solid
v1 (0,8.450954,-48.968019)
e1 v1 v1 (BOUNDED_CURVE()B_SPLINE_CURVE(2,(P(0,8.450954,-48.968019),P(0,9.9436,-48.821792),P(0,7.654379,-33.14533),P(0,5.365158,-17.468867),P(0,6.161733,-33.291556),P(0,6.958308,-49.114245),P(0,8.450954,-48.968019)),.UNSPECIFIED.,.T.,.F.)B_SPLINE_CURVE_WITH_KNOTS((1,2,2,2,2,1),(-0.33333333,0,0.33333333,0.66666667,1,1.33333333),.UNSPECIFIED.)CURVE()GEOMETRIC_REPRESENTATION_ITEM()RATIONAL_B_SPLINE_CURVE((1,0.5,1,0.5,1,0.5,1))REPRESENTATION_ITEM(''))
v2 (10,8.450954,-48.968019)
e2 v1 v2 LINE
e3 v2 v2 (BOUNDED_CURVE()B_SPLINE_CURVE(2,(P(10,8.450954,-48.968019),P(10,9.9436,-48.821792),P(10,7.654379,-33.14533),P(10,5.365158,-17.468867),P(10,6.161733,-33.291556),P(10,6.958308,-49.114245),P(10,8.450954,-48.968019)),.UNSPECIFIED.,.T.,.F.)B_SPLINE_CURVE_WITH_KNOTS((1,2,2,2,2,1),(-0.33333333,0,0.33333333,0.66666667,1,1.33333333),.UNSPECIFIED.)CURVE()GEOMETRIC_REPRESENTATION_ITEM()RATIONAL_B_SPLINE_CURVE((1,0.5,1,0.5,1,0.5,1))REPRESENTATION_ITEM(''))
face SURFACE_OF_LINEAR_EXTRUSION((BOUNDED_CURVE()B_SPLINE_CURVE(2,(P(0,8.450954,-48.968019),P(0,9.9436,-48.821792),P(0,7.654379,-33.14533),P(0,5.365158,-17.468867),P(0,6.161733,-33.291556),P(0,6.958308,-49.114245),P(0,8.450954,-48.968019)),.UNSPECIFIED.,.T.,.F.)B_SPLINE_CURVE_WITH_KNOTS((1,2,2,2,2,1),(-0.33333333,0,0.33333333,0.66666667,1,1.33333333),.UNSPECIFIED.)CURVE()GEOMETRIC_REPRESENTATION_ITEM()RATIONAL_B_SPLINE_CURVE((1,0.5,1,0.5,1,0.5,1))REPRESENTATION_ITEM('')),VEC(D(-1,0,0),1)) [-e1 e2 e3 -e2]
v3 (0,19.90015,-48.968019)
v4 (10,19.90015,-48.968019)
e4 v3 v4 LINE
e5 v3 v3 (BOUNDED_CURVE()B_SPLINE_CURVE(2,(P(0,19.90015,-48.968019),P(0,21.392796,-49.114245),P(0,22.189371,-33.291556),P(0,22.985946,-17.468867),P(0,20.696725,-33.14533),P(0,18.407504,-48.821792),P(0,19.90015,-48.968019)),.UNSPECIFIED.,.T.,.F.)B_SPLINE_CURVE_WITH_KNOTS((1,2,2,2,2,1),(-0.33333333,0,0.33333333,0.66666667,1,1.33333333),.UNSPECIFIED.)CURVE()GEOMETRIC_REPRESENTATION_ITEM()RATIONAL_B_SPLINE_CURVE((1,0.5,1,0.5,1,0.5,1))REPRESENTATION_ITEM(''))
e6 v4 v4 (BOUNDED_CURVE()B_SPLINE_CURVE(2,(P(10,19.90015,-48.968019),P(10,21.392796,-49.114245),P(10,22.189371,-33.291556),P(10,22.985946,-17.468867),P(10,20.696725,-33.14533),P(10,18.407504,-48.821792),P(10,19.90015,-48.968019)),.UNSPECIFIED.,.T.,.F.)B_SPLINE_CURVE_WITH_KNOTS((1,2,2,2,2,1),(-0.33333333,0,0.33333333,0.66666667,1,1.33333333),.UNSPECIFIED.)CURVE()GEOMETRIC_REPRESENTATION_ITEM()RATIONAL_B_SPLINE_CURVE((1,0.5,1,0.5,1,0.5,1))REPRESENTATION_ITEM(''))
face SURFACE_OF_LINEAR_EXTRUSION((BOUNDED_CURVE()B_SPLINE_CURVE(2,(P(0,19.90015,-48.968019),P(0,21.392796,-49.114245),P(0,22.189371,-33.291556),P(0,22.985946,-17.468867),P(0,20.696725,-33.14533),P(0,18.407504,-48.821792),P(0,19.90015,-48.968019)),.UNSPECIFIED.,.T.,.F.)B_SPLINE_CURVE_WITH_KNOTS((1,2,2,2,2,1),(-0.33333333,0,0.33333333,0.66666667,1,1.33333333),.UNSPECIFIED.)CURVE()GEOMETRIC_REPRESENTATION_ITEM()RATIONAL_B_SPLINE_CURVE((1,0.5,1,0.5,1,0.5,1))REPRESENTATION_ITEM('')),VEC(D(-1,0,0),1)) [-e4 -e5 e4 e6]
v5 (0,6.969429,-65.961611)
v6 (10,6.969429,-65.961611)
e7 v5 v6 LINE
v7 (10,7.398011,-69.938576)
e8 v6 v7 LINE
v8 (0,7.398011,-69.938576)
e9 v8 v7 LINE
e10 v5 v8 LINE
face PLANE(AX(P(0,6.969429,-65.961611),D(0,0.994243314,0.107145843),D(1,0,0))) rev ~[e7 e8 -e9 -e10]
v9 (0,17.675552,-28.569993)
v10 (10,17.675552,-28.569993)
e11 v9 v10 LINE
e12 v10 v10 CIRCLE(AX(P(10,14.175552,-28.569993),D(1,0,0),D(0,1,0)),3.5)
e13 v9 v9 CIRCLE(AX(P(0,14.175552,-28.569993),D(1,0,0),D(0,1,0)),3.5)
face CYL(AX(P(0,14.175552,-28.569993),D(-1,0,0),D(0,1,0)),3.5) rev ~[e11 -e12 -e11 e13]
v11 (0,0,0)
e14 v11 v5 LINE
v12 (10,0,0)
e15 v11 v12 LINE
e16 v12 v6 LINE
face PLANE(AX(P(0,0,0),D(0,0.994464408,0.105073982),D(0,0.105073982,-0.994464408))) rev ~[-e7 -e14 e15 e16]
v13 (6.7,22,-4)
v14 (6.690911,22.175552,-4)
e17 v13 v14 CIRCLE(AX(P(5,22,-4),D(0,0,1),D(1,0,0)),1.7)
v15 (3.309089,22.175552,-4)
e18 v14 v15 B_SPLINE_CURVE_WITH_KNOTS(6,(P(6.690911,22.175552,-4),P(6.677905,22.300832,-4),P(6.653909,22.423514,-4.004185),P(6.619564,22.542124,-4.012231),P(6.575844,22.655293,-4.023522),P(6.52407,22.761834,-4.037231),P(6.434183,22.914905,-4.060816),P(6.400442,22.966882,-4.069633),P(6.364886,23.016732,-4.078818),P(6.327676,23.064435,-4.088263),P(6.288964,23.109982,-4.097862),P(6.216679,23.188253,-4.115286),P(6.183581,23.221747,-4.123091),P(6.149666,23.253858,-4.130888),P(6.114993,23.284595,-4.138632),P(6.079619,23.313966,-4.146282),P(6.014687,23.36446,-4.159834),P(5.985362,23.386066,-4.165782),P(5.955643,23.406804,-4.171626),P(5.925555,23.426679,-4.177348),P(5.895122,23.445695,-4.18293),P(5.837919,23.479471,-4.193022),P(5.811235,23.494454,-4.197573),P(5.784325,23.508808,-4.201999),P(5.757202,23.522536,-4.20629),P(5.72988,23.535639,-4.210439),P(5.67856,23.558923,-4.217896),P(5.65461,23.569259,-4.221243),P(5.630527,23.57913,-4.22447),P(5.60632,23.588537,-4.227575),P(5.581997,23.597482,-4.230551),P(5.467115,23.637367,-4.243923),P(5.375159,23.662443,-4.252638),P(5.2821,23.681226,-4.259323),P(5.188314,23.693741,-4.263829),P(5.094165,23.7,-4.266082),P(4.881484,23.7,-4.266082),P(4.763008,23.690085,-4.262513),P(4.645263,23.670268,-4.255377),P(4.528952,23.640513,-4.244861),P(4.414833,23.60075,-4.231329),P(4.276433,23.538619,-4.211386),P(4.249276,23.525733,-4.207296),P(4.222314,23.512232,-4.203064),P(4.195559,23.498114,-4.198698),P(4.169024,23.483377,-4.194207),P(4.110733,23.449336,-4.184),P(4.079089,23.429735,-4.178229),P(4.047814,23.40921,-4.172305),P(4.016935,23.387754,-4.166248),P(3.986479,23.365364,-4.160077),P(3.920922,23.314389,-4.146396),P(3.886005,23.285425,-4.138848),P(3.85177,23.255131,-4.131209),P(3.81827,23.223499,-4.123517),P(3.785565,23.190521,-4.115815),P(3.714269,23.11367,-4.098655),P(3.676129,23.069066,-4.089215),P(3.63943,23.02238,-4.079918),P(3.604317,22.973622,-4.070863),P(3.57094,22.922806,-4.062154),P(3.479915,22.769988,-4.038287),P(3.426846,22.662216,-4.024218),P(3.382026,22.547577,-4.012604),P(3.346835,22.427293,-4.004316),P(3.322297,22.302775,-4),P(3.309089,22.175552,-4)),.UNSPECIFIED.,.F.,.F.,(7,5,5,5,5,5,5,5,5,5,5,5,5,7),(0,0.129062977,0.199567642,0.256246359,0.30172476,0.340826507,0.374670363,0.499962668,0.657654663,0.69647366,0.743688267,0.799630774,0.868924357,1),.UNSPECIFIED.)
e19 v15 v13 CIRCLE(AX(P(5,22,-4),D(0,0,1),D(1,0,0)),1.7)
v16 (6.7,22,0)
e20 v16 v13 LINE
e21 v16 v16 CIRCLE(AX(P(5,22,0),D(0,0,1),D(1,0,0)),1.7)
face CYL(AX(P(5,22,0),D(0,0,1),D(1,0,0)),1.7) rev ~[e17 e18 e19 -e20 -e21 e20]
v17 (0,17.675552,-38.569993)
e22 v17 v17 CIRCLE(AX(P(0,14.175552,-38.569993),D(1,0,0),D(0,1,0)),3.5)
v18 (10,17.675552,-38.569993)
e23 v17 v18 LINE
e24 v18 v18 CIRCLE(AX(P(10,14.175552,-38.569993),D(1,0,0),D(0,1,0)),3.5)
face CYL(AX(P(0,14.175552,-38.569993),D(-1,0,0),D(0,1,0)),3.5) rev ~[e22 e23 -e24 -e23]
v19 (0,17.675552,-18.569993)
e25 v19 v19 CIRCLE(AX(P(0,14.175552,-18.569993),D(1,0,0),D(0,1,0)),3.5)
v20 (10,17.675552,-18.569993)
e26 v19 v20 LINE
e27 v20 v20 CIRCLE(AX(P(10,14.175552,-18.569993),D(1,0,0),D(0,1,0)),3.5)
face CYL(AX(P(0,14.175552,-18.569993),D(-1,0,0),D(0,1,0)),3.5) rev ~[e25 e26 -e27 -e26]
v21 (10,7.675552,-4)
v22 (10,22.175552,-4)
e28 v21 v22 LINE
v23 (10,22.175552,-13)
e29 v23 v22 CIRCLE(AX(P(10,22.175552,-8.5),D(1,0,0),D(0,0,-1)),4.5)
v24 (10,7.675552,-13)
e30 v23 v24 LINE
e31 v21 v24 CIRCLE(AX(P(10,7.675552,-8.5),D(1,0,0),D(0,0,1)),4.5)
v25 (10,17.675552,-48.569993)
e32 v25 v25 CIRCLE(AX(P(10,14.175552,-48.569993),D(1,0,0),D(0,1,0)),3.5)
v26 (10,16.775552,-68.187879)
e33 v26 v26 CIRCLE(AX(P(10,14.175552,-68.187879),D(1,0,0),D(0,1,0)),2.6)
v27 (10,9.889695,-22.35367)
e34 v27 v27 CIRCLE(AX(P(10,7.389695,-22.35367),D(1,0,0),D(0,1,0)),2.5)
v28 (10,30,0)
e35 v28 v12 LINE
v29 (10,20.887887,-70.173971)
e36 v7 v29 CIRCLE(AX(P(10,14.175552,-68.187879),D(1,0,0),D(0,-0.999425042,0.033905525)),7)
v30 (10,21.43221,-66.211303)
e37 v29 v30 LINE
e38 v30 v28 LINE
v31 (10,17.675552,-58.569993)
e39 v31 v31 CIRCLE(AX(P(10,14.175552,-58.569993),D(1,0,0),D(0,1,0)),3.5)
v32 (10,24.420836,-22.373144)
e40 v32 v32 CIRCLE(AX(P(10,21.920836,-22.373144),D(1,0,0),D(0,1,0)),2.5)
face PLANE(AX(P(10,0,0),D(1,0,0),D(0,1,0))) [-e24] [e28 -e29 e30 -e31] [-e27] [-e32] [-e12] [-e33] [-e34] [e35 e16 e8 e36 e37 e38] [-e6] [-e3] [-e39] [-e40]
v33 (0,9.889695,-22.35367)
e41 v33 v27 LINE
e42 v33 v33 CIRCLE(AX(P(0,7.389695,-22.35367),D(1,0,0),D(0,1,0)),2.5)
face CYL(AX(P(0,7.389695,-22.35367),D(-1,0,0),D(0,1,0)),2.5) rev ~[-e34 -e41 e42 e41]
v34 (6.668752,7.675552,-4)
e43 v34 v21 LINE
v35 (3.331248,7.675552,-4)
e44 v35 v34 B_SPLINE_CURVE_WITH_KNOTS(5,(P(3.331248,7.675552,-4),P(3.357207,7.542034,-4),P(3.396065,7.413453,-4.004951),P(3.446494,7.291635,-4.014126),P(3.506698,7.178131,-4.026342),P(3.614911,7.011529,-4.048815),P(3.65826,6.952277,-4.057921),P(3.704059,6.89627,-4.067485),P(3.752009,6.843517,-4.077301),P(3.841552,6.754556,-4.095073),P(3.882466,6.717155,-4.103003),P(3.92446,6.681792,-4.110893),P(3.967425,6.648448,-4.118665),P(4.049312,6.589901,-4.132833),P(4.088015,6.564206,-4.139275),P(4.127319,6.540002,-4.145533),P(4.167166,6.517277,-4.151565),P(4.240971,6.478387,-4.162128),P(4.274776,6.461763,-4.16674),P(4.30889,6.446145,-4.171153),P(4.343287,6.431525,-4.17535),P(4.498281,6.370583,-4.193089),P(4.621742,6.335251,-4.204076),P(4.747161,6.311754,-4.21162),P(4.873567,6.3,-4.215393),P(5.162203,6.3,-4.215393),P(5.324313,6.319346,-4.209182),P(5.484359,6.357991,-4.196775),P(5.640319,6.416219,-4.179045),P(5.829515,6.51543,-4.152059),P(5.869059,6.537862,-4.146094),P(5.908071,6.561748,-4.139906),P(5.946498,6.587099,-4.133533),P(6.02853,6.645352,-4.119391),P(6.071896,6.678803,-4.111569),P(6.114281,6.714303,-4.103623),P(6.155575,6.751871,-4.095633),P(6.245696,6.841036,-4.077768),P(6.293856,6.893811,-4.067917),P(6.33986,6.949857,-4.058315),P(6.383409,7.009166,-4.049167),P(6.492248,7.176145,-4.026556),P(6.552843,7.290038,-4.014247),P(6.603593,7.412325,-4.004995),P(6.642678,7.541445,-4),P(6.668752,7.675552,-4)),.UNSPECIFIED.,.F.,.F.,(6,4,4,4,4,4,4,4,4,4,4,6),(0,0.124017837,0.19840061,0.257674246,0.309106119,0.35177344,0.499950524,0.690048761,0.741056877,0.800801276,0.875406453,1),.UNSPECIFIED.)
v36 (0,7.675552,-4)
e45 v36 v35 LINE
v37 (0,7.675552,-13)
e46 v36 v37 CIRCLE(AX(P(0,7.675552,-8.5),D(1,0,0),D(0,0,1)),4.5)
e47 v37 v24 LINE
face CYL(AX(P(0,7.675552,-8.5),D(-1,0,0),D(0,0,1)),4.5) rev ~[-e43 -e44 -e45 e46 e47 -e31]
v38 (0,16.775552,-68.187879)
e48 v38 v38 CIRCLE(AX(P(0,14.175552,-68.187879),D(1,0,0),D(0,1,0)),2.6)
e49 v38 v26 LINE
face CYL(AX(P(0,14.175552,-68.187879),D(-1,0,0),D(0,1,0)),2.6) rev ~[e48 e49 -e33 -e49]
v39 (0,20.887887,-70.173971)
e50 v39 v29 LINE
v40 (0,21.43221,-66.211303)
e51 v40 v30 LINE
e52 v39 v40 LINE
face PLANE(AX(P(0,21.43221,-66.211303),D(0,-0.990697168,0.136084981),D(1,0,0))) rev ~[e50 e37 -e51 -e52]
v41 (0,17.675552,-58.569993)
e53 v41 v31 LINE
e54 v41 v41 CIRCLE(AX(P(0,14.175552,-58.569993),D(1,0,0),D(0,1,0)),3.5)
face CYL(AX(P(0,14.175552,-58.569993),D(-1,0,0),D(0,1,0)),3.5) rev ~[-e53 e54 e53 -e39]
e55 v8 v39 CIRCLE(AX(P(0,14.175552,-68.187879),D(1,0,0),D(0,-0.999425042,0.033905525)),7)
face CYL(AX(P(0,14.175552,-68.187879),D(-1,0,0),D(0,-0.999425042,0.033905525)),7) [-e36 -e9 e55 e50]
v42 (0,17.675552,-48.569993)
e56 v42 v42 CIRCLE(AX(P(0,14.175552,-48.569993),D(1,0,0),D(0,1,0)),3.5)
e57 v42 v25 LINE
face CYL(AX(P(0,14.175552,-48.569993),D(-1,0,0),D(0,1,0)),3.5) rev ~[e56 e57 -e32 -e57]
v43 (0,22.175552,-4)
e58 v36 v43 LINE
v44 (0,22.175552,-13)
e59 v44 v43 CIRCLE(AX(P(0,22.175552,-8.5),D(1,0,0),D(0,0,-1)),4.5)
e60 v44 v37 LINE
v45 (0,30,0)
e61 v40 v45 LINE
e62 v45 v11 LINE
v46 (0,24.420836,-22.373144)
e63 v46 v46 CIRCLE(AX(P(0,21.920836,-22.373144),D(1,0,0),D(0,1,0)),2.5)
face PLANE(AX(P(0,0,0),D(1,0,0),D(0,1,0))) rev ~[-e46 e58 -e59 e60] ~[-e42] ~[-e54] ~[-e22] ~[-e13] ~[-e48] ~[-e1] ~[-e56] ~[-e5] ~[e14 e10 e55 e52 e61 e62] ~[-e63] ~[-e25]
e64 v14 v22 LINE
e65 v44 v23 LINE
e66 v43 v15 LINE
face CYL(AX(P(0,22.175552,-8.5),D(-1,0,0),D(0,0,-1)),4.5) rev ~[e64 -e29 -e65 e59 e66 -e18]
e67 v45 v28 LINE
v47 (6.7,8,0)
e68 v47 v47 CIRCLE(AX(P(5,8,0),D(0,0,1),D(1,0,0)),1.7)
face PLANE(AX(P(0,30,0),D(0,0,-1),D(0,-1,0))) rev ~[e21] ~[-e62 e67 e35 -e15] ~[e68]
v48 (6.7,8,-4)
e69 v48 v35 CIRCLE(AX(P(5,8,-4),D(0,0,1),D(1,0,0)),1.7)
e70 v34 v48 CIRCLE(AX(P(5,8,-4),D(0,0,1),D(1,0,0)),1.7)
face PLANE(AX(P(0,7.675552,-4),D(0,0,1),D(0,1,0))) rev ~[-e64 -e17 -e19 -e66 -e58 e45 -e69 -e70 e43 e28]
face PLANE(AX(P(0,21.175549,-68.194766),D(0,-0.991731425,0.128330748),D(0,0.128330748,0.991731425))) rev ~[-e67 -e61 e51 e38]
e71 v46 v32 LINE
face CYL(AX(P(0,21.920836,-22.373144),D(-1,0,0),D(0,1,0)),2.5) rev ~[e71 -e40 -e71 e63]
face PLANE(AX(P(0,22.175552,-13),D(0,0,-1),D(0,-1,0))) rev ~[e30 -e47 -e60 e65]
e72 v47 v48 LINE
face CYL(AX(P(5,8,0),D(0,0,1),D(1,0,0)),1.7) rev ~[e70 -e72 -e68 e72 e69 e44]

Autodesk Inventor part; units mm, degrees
ref_plane "YZ Plane" through (0, 0, 0) normal (1, 0, 0) x (0, 1, 0)
ref_plane "XZ Plane" through (0, 0, 0) normal (0, 1, 0) x (-1, 0, 0)
ref_plane "XY Plane" through (0, 0, 0) normal (0, 0, 1) x (1, 0, 0)
sketch "Skizze1" plane through (0, 0, 0) normal (1, 0, 0) x (0, 1, 0)
  line L0 (0, 0) -> (30, 0)
  line L1 (14.175552, 0) -> (14.175552, -68.187879) construction
  circle A0 centre (14.175552, -68.187879) radius 2.6
  circle A1 centre (14.175552, -68.187879) radius 7
  line L2 (0, 0) -> (7.179577, -67.95054)
  circle A2 centre (14.175552, -18.569993) radius 3.5
  arc A3 (7.675552, -4) -> (7.675552, -13) centre (7.675552, -8.5) ccw
  circle A4 centre (14.175552, -28.569993) radius 3.5
  circle A5 centre (14.175552, -38.569993) radius 3.5
  circle A6 centre (14.175552, -48.569993) radius 3.5
  circle A7 centre (14.175552, -58.569993) radius 3.5
  circle A8 centre (21.920836, -22.373144) radius 2.5
  circle A9 centre (7.389695, -22.35367) radius 2.5
  line L3 (7.675552, -4) -> (14.175552, -4)
  line L4 (7.675552, -13) -> (14.175552, -13)
  ellipse E0 centre (20.928749, -38.468301) end of major axis (19.90015, -48.968019) minor radius 0.865905
  ellipse E1 centre (7.422355, -38.468301) end of major axis (8.450954, -48.968019) minor radius 0.865905
  line L5 (21.175549, -68.194766) -> (30, 0)
  arc A10 (22.175552, -13) -> (22.175552, -4) centre (22.175552, -8.5) ccw
  line L6 (14.175552, -4) -> (22.175552, -4)
  line L7 (14.175552, -13) -> (22.175552, -13)
  point P0 (11.380257, -37.526628)
  point P1 (20.96203, -66.472155)
  dimension "d0" = 30
  dimension "d32" = 70
  dimension "d34" = 5.2
  dimension "d35" = 14
  dimension "d36" = 7
  dimension "d42" = 9
  dimension "d43" = 8.5
  dimension "d44" = 6.5
  dimension "d47" = 10
  dimension "d54" = 5
  dimension "d59" = 5
  dimension "d60" = 5
  dimension "d67" = 9
  dimension "d68" = 8
sketch "Skizze1 outline for Extrusion1" plane through (0, 0, 0) normal (1, 0, 0) x (0, 1, 0)
  circle A0 centre (14.175552, -58.569993) radius 3.5
  arc A1 (7.179577, -67.95054) -> (21.175549, -68.194766) centre (14.175552, -68.187879) ccw
  line L0 (21.175549, -68.194766) -> (30, 0)
  line L1 (30, 0) -> (0, 0)
  line L2 (0, 0) -> (7.179577, -67.95054)
  circle A2 centre (14.175552, -68.187879) radius 2.6
  arc A3 (22.175552, -13) -> (22.175552, -4) centre (22.175552, -8.5) ccw
  line L3 (22.175552, -13) -> (7.675552, -13)
  arc A4 (7.675552, -4) -> (7.675552, -13) centre (7.675552, -8.5) ccw
  line L4 (7.675552, -4) -> (22.175552, -4)
  circle A5 centre (14.175552, -48.569993) radius 3.5
  spline S0 degree 2 poles (8.450954, -48.968019) (9.9436, -48.821792) (7.654379, -33.14533) (5.365158, -17.468867) (6.161733, -33.291556) (6.958308, -49.114245) (8.450954, -48.968019) knots 0 0 0 0.33333333 0.33333333 0.66666667 0.66666667 1 1 1 weights 1 0.5 1 0.5 1 0.5 1
  circle A6 centre (14.175552, -38.569993) radius 3.5
  circle A7 centre (14.175552, -28.569993) radius 3.5
  spline S1 degree 2 poles (19.90015, -48.968019) (21.392796, -49.114245) (22.189371, -33.291556) (22.985946, -17.468867) (20.696725, -33.14533) (18.407504, -48.821792) (19.90015, -48.968019) knots 0 0 0 0.33333333 0.33333333 0.66666667 0.66666667 1 1 1 weights 1 0.5 1 0.5 1 0.5 1
  circle A8 centre (7.389695, -22.35367) radius 2.5
  circle A9 centre (14.175552, -18.569993) radius 3.5
  circle A10 centre (21.920836, -22.373144) radius 2.5
extrude "Extrusion1" add sketch "Skizze1 outline for Extrusion1" along normal blind 10
sketch "Skizze3" plane through (0, 0, 0) normal (0, 0, 1) x (1, 0, 0)
  circle A0 centre (5, 8) radius 1.7
  line L0 (0, 0) -> (10, 0) projected
  circle A1 centre (5, 22) radius 1.7
  line L1 (0, 30) -> (10, 30) projected
  line L2 (10, 30) -> (10, 0) projected
  dimension "d24" = 3.4
  dimension "d25" = 8
  dimension "d26" = 3.4
  dimension "d27" = 8
  dimension "d28" = 5
sketch "Skizze3 outline for Extrusion2" plane through (0, 0, 0) normal (0, 0, 1) x (1, 0, 0)
  circle A0 centre (5, 8) radius 1.7
  circle A1 centre (5, 22) radius 1.7
extrude "Extrusion2" cut sketch "Skizze3 outline for Extrusion2" against normal blind 11
chamfer "Fase1" distance 2 angle 45 1 edges at (5, 7.1796, -67.9505)
chamfer "Fase3" distance 2 angle 45 1 edges at (5, 21.1755, -68.1948)
properties part number "Radaufhängung" material "PC/ABS-Kunststoff"
